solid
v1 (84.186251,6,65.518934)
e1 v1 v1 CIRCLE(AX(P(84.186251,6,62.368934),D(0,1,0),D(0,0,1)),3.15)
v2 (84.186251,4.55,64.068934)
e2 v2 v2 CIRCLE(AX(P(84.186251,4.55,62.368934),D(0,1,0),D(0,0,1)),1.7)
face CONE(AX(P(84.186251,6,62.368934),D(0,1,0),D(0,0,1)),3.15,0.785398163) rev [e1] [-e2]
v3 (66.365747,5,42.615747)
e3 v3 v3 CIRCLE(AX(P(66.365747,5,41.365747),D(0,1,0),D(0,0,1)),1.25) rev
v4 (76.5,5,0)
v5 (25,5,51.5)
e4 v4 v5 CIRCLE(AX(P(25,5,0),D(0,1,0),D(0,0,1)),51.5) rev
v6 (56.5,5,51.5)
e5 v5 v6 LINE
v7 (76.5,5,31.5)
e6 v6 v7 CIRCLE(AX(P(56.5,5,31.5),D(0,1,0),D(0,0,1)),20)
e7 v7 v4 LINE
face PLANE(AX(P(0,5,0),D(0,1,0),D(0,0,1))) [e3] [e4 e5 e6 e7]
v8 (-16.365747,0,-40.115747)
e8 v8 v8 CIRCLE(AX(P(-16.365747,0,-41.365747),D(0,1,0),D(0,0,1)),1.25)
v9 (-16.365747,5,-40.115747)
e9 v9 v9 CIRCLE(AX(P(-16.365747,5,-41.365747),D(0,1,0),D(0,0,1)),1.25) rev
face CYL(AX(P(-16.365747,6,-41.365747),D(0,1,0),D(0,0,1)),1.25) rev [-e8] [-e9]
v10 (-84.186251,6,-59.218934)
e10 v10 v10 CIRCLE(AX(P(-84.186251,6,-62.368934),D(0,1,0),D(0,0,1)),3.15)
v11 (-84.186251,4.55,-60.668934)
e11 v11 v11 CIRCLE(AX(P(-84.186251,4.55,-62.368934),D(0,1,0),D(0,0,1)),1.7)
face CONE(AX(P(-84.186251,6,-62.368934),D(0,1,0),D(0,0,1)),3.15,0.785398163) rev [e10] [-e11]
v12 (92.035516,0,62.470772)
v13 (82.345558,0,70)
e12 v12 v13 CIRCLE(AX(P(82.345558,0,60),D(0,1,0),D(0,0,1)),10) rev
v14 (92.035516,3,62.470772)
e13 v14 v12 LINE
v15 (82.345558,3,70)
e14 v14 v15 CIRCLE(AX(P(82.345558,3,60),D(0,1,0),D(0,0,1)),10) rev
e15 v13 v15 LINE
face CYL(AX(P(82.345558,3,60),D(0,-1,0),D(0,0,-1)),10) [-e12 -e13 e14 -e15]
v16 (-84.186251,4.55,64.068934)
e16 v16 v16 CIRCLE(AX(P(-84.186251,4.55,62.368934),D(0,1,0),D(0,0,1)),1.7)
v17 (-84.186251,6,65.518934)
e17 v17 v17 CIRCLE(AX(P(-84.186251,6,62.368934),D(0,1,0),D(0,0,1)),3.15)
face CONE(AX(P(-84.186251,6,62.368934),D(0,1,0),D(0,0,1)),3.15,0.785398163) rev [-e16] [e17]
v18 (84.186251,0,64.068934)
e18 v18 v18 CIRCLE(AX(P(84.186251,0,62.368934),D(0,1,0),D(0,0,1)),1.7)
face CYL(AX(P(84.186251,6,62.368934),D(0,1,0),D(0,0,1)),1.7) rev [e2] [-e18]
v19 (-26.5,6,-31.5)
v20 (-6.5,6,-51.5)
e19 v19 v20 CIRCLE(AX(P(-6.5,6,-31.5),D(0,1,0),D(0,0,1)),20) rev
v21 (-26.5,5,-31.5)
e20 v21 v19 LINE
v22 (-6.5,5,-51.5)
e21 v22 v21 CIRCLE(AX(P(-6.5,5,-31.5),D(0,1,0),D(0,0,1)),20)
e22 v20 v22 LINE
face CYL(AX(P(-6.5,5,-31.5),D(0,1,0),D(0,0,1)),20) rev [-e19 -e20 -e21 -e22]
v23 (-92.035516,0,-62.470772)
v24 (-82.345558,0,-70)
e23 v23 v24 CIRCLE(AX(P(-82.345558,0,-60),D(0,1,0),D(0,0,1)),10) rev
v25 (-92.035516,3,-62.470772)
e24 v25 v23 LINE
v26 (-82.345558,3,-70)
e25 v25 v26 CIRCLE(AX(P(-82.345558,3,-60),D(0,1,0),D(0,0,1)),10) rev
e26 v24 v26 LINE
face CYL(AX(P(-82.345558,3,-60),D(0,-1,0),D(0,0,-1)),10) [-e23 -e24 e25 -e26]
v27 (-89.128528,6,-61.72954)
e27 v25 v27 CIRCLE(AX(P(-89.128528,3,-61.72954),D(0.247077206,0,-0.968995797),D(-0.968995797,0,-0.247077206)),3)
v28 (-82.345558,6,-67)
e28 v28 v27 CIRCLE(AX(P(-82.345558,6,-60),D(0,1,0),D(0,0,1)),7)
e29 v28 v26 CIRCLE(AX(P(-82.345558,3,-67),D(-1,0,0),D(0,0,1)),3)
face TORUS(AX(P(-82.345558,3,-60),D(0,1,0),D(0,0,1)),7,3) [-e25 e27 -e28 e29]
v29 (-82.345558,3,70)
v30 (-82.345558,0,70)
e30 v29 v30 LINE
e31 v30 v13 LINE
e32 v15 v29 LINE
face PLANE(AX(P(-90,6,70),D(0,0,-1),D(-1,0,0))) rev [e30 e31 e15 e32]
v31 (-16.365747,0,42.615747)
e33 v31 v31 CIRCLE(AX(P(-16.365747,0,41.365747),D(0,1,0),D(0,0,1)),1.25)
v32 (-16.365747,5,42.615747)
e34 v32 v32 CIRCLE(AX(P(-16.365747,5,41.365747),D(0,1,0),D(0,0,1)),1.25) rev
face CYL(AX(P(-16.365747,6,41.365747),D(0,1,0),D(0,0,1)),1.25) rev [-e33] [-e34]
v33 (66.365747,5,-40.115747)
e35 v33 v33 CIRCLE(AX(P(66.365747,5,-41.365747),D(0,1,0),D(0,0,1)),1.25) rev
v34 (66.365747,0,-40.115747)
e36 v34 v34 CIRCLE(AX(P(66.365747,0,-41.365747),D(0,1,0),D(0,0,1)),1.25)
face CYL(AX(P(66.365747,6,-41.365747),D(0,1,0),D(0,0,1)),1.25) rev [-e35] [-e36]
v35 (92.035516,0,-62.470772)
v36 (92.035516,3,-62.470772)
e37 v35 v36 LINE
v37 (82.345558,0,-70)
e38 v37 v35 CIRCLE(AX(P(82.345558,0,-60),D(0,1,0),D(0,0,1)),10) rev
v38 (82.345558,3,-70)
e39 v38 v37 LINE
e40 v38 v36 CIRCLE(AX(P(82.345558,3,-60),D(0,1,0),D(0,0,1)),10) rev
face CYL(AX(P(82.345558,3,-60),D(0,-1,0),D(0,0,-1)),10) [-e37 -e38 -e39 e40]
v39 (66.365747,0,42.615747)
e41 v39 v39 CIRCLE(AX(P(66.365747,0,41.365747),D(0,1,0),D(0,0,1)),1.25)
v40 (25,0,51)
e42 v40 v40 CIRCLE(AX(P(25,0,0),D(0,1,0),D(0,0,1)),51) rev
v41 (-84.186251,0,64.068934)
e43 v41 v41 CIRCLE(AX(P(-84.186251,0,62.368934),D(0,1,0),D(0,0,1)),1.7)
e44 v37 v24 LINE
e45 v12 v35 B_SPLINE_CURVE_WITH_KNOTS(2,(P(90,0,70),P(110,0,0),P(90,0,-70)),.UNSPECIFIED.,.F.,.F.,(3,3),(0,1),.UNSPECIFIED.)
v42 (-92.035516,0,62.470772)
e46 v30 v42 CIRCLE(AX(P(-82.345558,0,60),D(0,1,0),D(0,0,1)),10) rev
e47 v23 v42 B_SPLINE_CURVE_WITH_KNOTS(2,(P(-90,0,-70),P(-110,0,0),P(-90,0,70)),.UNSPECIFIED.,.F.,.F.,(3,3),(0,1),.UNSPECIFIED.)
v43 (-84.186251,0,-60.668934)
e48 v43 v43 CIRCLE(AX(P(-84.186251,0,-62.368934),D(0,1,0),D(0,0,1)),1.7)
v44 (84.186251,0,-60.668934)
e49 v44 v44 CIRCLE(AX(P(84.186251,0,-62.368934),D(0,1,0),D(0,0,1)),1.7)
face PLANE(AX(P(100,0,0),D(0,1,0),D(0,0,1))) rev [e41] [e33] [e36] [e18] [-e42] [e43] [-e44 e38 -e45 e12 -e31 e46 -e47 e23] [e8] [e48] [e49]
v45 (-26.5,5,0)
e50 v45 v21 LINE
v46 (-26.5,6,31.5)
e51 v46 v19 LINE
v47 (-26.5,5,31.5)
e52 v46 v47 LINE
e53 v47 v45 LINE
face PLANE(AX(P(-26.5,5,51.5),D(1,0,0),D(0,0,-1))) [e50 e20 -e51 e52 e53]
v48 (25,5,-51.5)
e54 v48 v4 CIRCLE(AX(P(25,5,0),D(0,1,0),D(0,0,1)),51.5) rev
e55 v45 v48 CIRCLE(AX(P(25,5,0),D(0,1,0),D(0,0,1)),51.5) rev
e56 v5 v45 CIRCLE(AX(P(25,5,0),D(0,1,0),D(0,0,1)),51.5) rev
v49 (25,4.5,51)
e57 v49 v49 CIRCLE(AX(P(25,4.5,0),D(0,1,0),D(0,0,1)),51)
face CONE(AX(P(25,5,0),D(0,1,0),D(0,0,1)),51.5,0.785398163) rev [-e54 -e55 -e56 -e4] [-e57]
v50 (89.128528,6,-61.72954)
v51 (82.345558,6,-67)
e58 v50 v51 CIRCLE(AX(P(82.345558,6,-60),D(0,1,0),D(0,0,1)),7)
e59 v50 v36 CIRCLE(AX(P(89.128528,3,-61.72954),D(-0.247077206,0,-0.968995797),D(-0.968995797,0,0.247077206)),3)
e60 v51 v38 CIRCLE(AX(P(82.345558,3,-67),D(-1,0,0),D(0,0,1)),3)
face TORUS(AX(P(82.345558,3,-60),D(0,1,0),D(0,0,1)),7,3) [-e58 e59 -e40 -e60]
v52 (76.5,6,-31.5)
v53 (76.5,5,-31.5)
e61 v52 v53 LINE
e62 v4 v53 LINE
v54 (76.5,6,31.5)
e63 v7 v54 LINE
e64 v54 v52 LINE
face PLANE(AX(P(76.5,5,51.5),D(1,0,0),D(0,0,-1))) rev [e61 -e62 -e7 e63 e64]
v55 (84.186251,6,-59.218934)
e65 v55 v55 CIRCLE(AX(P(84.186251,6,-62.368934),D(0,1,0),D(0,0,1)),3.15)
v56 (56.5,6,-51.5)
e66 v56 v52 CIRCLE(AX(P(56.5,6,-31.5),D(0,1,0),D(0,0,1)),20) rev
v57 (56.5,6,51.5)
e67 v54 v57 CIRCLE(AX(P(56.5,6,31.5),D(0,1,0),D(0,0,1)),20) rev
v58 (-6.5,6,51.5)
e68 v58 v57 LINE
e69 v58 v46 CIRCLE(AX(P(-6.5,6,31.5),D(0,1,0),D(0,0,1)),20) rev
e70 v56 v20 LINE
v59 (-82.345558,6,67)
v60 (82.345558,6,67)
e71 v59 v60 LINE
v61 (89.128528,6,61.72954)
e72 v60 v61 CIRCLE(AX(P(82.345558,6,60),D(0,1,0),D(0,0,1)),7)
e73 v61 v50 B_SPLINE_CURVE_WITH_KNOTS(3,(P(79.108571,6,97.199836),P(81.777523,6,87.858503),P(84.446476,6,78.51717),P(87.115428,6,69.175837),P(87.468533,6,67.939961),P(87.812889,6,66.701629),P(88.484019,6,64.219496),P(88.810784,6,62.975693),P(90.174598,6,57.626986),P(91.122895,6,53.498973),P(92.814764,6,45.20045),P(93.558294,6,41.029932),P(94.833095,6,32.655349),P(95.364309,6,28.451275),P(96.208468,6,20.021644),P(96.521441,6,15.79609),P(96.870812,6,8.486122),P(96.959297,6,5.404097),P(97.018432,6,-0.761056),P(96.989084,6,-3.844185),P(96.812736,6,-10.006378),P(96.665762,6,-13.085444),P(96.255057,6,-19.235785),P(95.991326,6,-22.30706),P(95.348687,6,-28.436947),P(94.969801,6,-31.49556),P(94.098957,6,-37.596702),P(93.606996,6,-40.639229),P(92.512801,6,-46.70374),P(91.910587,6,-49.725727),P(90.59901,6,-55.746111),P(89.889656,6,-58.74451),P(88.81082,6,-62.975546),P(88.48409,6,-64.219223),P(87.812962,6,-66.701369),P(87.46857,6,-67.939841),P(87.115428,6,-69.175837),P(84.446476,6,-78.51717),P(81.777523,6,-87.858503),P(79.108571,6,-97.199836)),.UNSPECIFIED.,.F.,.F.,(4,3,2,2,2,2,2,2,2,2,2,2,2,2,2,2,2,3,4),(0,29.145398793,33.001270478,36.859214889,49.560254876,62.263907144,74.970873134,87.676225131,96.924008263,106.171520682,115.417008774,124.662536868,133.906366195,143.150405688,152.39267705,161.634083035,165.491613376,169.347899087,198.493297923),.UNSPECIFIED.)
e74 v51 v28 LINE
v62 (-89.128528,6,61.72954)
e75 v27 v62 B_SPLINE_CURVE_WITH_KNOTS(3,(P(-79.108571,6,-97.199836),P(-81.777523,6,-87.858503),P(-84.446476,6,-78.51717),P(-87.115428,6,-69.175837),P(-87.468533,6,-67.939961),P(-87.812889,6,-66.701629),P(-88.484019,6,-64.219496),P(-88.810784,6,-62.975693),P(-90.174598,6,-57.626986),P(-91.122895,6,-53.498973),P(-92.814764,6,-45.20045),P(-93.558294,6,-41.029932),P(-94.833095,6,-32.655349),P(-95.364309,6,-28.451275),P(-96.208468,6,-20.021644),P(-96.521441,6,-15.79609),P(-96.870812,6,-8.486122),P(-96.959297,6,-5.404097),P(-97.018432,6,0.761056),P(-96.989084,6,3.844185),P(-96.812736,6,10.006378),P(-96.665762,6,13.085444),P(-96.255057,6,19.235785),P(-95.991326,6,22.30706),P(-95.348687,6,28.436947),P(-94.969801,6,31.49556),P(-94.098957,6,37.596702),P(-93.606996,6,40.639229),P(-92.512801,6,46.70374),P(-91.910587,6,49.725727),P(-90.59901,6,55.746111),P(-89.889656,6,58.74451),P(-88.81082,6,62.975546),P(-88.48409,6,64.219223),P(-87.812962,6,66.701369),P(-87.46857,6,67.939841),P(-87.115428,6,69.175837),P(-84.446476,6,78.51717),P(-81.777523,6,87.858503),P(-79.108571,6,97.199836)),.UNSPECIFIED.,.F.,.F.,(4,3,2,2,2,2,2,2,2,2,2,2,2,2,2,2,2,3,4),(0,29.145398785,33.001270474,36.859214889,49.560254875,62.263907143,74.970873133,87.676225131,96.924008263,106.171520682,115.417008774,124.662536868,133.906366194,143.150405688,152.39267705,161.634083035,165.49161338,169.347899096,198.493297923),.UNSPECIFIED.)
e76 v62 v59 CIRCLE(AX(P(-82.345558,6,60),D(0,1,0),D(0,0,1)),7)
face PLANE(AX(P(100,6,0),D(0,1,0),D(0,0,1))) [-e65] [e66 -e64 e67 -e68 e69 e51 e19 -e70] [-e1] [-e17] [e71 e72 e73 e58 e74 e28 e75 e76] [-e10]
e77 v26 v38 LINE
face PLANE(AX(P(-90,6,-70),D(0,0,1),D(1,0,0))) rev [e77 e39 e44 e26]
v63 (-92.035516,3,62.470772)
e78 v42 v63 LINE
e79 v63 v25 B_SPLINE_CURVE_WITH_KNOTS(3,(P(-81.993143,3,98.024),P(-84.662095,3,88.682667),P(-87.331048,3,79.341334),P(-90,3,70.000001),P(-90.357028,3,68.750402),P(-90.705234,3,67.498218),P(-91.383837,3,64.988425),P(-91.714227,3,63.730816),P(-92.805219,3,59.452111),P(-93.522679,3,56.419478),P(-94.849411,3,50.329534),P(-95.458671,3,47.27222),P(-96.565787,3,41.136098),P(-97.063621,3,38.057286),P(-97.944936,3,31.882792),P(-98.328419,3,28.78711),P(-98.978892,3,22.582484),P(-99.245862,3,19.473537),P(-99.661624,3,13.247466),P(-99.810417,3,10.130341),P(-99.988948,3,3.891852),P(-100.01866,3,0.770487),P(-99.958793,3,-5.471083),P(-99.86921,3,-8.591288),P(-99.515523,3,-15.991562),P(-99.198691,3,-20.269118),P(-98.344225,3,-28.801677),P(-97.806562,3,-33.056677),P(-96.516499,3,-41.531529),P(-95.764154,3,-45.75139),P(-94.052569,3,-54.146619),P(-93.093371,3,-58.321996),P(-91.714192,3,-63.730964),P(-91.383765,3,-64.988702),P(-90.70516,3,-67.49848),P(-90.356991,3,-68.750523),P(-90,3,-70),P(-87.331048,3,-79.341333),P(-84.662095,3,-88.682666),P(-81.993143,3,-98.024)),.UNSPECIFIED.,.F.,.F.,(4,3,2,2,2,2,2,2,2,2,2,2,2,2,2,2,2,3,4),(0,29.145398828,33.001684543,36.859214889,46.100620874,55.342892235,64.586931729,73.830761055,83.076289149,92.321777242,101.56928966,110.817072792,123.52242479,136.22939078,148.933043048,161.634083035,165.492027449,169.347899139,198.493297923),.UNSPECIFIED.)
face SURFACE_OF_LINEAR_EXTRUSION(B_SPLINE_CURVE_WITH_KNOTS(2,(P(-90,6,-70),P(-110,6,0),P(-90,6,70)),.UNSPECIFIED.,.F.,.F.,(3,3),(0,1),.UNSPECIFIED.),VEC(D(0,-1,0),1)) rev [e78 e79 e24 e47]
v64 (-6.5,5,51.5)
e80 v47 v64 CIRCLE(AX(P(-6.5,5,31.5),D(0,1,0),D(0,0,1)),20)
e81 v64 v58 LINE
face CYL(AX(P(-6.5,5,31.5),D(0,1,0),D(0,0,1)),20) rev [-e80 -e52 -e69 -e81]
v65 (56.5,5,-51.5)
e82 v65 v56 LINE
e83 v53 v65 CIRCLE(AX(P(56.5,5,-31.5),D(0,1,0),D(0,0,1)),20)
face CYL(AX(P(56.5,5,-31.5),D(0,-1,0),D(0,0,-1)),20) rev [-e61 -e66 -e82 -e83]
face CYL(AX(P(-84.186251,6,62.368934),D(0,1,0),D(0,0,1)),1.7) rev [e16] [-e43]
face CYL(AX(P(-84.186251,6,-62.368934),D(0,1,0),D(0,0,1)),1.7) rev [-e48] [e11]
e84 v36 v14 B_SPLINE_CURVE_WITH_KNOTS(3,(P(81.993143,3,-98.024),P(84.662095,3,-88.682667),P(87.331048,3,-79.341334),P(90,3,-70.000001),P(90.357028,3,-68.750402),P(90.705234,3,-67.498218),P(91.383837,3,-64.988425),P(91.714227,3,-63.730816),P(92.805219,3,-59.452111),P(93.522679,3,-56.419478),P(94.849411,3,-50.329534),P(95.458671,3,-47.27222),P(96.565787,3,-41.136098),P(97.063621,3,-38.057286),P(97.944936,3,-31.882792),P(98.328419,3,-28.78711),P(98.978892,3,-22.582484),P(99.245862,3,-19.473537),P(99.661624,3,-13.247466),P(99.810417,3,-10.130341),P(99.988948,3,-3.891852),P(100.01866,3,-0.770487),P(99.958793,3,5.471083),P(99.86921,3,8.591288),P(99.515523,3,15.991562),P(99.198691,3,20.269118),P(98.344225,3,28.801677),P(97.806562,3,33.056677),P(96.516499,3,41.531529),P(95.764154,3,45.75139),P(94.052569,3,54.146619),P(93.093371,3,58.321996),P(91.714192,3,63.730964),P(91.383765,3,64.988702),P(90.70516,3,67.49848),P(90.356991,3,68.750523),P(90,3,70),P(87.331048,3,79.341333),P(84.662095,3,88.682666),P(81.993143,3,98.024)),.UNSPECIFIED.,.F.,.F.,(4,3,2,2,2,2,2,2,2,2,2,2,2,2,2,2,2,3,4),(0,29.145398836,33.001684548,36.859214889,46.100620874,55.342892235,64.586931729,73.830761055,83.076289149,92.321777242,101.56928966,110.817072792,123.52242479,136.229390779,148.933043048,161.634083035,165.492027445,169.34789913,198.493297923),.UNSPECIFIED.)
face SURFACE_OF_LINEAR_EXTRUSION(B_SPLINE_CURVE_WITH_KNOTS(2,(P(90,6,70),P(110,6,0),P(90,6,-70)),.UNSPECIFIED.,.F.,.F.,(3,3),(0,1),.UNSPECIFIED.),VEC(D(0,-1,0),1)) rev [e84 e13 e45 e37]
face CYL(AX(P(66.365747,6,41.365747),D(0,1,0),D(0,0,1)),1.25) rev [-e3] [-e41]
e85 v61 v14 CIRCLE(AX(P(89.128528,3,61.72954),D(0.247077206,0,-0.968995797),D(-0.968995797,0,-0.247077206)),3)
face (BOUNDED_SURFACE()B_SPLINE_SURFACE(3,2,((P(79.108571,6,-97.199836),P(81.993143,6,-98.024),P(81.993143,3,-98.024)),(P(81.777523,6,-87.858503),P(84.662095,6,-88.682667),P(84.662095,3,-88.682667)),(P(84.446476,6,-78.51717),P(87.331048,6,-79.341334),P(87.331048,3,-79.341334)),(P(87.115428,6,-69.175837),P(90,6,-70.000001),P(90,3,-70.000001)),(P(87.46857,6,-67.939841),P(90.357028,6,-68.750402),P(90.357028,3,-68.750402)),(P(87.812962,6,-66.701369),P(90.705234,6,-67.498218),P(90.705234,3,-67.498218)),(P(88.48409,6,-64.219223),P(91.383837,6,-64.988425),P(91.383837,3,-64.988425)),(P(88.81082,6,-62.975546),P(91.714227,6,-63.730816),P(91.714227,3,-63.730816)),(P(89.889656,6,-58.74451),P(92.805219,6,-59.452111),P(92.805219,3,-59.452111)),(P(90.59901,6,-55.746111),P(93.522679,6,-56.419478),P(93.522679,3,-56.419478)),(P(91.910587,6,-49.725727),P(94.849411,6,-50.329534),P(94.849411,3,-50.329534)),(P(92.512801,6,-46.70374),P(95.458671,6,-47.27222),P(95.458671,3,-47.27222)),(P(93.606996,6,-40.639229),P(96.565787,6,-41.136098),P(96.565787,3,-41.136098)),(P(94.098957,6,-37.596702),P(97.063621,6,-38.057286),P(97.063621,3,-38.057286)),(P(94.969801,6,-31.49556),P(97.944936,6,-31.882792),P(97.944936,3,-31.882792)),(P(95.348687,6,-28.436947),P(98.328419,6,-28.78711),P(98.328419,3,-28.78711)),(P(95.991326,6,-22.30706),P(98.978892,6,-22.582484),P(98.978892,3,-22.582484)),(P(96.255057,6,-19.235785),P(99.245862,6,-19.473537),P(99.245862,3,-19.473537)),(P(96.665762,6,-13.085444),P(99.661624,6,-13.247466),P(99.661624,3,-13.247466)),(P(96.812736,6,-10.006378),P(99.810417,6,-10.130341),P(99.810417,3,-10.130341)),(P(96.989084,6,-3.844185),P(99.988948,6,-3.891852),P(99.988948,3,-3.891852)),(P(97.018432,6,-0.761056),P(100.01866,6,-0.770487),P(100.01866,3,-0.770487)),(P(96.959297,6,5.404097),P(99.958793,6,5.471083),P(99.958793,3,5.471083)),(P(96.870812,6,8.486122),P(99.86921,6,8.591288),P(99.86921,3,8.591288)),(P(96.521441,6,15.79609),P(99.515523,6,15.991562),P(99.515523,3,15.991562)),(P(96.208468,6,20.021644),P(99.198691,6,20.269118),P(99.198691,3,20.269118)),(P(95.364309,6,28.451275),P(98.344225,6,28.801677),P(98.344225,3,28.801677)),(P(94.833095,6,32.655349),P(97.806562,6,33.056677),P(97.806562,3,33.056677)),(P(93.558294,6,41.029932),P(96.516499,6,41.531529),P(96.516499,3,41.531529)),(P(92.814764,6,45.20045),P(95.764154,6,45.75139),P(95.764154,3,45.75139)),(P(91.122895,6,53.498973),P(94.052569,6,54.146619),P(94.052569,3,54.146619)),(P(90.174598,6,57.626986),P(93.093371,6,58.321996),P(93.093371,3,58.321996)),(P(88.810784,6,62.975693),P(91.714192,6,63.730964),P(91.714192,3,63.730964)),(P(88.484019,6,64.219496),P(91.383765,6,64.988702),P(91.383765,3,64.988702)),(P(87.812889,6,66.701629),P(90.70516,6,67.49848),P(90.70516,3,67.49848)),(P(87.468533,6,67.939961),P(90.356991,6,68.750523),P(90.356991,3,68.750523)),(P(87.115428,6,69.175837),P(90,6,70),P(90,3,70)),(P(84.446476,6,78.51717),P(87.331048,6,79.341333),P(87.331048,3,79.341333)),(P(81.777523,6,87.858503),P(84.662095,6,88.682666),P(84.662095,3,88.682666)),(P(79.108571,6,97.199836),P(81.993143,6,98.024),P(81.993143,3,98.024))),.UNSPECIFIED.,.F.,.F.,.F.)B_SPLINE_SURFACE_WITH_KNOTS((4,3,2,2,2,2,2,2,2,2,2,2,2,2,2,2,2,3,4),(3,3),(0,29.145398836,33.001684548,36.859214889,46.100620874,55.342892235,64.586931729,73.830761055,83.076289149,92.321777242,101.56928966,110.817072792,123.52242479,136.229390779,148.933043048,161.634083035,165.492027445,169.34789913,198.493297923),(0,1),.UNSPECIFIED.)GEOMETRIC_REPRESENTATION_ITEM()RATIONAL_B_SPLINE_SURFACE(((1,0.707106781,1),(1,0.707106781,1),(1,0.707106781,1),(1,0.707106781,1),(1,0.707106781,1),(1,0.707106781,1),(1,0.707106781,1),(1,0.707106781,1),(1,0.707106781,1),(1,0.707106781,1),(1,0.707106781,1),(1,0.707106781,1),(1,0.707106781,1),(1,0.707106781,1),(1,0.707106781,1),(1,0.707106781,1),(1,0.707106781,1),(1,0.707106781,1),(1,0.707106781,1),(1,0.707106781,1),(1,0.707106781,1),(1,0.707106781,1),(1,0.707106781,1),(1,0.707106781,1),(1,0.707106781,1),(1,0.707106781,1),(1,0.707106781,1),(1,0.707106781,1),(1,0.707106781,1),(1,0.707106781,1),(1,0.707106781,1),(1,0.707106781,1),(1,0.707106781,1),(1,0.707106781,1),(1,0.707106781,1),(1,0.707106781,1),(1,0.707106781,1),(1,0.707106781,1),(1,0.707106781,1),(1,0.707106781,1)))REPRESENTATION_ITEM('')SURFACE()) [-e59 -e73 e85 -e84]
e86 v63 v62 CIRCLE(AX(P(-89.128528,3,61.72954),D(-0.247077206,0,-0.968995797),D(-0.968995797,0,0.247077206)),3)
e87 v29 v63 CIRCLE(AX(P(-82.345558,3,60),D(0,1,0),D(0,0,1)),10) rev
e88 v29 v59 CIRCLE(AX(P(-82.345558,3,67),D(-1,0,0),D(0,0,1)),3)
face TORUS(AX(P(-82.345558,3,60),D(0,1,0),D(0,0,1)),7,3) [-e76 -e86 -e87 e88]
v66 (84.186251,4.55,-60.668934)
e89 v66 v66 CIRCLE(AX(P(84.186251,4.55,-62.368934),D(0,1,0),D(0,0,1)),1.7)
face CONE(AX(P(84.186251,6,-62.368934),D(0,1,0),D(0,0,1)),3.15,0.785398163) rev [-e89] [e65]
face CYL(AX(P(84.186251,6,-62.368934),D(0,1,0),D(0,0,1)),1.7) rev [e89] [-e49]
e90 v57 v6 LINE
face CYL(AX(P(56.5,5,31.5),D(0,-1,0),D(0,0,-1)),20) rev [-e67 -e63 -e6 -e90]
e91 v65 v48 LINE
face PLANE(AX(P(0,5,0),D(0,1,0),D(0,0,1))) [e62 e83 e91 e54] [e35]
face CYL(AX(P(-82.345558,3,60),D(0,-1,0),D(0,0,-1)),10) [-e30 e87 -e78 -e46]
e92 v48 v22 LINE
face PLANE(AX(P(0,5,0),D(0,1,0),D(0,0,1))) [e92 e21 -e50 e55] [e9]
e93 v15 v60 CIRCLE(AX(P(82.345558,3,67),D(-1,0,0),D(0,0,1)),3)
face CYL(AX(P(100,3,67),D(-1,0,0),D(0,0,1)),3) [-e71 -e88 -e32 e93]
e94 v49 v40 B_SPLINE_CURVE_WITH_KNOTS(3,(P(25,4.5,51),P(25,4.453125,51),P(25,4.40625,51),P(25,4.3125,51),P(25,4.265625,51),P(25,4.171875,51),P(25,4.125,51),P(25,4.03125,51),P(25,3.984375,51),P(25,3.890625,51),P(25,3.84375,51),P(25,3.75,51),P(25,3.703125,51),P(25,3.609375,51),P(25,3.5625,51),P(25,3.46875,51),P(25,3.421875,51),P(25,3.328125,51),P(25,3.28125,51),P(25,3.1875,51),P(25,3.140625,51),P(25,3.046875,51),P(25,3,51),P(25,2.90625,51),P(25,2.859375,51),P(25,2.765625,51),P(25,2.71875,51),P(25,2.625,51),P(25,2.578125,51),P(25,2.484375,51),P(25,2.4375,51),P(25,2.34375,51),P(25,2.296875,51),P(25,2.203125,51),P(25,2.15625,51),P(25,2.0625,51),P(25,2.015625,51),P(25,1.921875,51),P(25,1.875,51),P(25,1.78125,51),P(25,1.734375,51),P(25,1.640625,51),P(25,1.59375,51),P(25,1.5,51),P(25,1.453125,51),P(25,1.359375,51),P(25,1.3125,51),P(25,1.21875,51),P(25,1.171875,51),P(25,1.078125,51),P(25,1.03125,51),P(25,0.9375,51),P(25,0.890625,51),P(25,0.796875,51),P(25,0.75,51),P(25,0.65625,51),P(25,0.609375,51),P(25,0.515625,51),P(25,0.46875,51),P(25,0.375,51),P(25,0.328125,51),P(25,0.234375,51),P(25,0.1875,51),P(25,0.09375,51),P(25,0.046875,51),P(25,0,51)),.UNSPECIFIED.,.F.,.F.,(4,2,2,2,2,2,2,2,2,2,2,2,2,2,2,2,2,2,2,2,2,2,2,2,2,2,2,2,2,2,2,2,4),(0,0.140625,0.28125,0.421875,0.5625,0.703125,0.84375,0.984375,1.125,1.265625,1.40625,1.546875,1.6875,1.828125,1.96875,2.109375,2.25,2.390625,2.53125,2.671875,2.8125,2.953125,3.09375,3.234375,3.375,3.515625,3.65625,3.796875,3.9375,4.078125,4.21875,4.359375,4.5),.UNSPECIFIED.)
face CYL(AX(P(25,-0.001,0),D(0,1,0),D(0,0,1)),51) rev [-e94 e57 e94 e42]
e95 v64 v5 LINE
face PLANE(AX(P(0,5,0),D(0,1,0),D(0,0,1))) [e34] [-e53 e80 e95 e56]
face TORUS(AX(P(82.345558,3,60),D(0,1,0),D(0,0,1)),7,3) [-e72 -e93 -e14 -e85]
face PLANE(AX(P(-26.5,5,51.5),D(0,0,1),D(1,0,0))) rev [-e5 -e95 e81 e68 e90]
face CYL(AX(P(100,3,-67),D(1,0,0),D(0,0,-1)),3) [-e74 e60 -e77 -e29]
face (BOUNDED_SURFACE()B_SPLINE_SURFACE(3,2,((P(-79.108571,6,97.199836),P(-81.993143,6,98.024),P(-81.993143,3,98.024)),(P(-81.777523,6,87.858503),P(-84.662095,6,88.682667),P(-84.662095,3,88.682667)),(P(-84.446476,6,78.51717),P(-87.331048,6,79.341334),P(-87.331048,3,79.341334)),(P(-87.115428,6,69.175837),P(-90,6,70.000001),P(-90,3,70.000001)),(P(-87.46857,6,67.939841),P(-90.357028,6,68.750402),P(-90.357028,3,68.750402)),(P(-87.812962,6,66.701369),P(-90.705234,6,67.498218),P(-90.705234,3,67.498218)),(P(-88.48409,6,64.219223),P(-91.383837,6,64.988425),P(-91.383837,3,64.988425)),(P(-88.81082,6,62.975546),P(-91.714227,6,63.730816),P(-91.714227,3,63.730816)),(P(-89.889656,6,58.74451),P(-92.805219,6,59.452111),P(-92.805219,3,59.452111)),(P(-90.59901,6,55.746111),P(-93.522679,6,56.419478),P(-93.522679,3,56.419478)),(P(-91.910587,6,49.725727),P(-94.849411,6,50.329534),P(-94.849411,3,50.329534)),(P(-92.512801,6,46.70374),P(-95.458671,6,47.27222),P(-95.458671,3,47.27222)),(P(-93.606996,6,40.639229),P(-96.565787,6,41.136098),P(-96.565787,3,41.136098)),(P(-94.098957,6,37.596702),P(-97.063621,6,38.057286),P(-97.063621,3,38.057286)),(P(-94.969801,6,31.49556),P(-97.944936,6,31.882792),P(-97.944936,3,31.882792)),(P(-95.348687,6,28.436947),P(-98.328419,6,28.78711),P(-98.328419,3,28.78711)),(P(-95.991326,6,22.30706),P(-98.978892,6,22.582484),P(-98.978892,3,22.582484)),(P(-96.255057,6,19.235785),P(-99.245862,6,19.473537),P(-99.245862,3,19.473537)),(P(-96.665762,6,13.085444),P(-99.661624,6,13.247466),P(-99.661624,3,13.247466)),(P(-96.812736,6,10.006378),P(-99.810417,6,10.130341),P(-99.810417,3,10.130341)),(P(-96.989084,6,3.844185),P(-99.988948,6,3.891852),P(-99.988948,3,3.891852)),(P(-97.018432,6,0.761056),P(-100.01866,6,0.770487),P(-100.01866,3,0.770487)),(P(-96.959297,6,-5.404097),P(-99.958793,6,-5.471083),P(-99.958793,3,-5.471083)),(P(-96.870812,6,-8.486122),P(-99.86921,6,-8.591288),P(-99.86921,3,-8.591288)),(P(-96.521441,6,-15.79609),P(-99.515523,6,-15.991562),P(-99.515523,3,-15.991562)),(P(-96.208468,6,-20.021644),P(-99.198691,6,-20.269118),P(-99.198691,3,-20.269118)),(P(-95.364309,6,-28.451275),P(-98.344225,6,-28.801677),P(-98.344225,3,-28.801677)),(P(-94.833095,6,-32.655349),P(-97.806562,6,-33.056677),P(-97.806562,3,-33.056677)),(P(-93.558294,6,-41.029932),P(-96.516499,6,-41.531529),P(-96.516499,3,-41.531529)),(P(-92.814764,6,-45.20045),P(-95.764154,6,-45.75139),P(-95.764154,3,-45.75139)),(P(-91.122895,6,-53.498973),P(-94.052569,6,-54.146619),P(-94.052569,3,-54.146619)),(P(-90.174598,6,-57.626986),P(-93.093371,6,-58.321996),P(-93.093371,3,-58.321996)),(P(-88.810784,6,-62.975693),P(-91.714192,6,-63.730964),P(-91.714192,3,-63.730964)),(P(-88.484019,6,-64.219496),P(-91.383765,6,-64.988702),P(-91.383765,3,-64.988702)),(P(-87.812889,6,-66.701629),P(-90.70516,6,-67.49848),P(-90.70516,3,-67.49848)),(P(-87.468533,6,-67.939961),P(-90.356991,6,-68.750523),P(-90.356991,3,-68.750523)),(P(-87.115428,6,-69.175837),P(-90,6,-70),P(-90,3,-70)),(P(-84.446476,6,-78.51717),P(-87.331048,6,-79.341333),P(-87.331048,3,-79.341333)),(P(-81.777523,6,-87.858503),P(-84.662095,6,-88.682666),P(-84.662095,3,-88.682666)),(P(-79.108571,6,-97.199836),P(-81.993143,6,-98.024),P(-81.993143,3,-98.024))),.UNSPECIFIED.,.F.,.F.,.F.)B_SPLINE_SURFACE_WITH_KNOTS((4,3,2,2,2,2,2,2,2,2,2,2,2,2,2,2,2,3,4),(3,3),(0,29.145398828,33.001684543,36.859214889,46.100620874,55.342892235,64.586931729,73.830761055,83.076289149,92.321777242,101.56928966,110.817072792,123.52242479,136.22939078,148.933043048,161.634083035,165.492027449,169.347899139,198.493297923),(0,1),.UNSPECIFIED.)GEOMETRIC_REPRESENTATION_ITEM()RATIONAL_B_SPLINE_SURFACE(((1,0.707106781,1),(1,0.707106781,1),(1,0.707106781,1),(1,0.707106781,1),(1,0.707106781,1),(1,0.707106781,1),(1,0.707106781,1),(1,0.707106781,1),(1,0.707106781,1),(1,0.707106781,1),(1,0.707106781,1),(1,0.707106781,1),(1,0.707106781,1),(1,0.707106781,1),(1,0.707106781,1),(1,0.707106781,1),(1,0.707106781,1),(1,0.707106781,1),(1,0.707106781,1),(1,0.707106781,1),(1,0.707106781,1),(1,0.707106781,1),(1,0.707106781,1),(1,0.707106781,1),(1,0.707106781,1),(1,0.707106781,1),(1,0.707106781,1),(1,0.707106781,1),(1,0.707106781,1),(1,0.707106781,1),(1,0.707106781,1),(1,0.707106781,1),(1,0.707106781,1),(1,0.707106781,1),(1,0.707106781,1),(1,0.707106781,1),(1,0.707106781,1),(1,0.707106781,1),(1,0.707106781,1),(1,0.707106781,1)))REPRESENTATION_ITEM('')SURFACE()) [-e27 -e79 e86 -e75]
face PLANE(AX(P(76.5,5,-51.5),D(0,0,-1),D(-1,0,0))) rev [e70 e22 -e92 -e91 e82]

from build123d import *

# Parameters (mm, degrees)
BOSS_EXTRUDE1_DEPTH                             = 6
FILLET1_R                                       = 10
FILLET2_R                                       = 3
CUT_EXTRUDE1_REACH                              = 124.213
SKETCH2_R                                       = 51
M3X0_5_TAPPED_HOLE1_D                           = 2.5
CSK_FOR_M3_FLAT_HEAD_MACHINE_SCREW6_D           = 3.4
CSK_FOR_M3_FLAT_HEAD_MACHINE_SCREW6_CSINK_D     = 6.3
CSK_FOR_M3_FLAT_HEAD_MACHINE_SCREW6_CSINK_ANGLE = 90
SKETCH2_7_W                                     = 103
SKETCH2_7_H                                     = 103
CUT_EXTRUDE3_DEPTH                              = 1
FILLET4_R                                       = 20
CHAMFER1_SIZE                                   = 0.5


with BuildPart() as part:
    # Sketch1 → Boss-Extrude1 (new body)
    with BuildSketch(Plane(origin=(0, 0, 0), x_dir=(1, 0, 0), z_dir=(0, 1, 0))):
        with BuildLine():
            Line((-90, 70), (90, 70))
            add(Edge.make_bspline(
                [(90, 70), (110, 0), (90, -70)],
                knots=[0, 0, 0, 1, 1, 1], degree=2))
            Line((90, -70), (-90, -70))
            add(Edge.make_bspline(
                [(-90, 70), (-110, 0), (-90, -70)],
                knots=[0, 0, 0, 1, 1, 1], degree=2))
        make_face()
    extrude(amount=BOSS_EXTRUDE1_DEPTH)

    # Fillet1
    fillet1_edges = [part.edges().sort_by_distance(p)[0] for p in [
        (-90, 3, -70),
        (90, 3, -70),
        (90, 3, 70),
        (-90, 3, 70),
    ]]
    fillet(fillet1_edges, radius=FILLET1_R)

    # Fillet2
    fillet2_edges = [part.edges().sort_by_distance(p)[0] for p in [
        (-100, 6, -3e-09),
        (0, 6, -70),
        (100, 6, -3e-09),
        (0, 6, 70),
        (-88.48120263, 6, 67.896446056),
        (88.48120263, 6, 67.896446056),
        (88.48120263, 6, -67.896446056),
        (-88.48120263, 6, -67.896446056),
    ]]
    fillet(fillet2_edges, radius=FILLET2_R)

    # Sketch2 → Cut-Extrude1 (cut, up to next)
    with BuildSketch(Plane(origin=(0, 6, 0), x_dir=(1, 0, 0), z_dir=(0, 1, 0)), mode=Mode.PRIVATE) as cut_extrude1_sk1:
        with Locations(Location((25, 0, 0), (0, 0, 270))):
            Circle(SKETCH2_R)
    cut_extrude1_tool1 = extrude(cut_extrude1_sk1.sketch, amount=-CUT_EXTRUDE1_REACH, mode=Mode.PRIVATE) & part.part
    add(cut_extrude1_tool1.solids().sort_by_distance((25, 6, 0))[0], mode=Mode.SUBTRACT)

    # M3x0.5 Tapped Hole1 (through all)
    with Locations(Plane(origin=(0, 6, 0), x_dir=(1, 0, 0), z_dir=(0, 1, 0))):
        with Locations((66.365746699, 41.365746699), (66.365746699, -41.365746699), (-16.365746699, -41.365746699), (-16.365746699, 41.365746699)):
            Hole(M3X0_5_TAPPED_HOLE1_D / 2)

    # CSK for M3 Flat Head Machine Screw6 (through all)
    with Locations(Plane(origin=(0, 6, 0), x_dir=(1, 0, 0), z_dir=(0, 1, 0))):
        with Locations((-84.186251123, 62.368933817), (84.186251123, 62.368933817), (84.186251123, -62.368933817), (-84.186251123, -62.368933817)):
            CounterSinkHole(CSK_FOR_M3_FLAT_HEAD_MACHINE_SCREW6_D / 2, CSK_FOR_M3_FLAT_HEAD_MACHINE_SCREW6_CSINK_D / 2, counter_sink_angle=CSK_FOR_M3_FLAT_HEAD_MACHINE_SCREW6_CSINK_ANGLE)

    # Sketch2<7> → Cut-Extrude3 (cut)
    with BuildSketch(Plane(origin=(0, 6, 0), x_dir=(1, 0, 0), z_dir=(0, 1, 0))):
        with Locations((25, 0)):
            Rectangle(SKETCH2_7_W, SKETCH2_7_H)
    extrude(amount=-CUT_EXTRUDE3_DEPTH, mode=Mode.SUBTRACT)

    # Fillet4
    fillet4_edges = [part.edges().sort_by_distance(p)[0] for p in [
        (76.5, 5.5, 51.5),
        (-26.5, 5.5, 51.5),
        (-26.5, 5.5, -51.5),
        (76.5, 5.5, -51.5),
    ]]
    fillet(fillet4_edges, radius=FILLET4_R)

    # Chamfer1
    chamfer1_edges = [part.edges().sort_by_distance(p)[0] for p in [
        (25, 5, -51),
    ]]
    chamfer(chamfer1_edges, length=CHAMFER1_SIZE - 0.0001)  # a hair under: the kernel refuses the full size


solid = part.part
